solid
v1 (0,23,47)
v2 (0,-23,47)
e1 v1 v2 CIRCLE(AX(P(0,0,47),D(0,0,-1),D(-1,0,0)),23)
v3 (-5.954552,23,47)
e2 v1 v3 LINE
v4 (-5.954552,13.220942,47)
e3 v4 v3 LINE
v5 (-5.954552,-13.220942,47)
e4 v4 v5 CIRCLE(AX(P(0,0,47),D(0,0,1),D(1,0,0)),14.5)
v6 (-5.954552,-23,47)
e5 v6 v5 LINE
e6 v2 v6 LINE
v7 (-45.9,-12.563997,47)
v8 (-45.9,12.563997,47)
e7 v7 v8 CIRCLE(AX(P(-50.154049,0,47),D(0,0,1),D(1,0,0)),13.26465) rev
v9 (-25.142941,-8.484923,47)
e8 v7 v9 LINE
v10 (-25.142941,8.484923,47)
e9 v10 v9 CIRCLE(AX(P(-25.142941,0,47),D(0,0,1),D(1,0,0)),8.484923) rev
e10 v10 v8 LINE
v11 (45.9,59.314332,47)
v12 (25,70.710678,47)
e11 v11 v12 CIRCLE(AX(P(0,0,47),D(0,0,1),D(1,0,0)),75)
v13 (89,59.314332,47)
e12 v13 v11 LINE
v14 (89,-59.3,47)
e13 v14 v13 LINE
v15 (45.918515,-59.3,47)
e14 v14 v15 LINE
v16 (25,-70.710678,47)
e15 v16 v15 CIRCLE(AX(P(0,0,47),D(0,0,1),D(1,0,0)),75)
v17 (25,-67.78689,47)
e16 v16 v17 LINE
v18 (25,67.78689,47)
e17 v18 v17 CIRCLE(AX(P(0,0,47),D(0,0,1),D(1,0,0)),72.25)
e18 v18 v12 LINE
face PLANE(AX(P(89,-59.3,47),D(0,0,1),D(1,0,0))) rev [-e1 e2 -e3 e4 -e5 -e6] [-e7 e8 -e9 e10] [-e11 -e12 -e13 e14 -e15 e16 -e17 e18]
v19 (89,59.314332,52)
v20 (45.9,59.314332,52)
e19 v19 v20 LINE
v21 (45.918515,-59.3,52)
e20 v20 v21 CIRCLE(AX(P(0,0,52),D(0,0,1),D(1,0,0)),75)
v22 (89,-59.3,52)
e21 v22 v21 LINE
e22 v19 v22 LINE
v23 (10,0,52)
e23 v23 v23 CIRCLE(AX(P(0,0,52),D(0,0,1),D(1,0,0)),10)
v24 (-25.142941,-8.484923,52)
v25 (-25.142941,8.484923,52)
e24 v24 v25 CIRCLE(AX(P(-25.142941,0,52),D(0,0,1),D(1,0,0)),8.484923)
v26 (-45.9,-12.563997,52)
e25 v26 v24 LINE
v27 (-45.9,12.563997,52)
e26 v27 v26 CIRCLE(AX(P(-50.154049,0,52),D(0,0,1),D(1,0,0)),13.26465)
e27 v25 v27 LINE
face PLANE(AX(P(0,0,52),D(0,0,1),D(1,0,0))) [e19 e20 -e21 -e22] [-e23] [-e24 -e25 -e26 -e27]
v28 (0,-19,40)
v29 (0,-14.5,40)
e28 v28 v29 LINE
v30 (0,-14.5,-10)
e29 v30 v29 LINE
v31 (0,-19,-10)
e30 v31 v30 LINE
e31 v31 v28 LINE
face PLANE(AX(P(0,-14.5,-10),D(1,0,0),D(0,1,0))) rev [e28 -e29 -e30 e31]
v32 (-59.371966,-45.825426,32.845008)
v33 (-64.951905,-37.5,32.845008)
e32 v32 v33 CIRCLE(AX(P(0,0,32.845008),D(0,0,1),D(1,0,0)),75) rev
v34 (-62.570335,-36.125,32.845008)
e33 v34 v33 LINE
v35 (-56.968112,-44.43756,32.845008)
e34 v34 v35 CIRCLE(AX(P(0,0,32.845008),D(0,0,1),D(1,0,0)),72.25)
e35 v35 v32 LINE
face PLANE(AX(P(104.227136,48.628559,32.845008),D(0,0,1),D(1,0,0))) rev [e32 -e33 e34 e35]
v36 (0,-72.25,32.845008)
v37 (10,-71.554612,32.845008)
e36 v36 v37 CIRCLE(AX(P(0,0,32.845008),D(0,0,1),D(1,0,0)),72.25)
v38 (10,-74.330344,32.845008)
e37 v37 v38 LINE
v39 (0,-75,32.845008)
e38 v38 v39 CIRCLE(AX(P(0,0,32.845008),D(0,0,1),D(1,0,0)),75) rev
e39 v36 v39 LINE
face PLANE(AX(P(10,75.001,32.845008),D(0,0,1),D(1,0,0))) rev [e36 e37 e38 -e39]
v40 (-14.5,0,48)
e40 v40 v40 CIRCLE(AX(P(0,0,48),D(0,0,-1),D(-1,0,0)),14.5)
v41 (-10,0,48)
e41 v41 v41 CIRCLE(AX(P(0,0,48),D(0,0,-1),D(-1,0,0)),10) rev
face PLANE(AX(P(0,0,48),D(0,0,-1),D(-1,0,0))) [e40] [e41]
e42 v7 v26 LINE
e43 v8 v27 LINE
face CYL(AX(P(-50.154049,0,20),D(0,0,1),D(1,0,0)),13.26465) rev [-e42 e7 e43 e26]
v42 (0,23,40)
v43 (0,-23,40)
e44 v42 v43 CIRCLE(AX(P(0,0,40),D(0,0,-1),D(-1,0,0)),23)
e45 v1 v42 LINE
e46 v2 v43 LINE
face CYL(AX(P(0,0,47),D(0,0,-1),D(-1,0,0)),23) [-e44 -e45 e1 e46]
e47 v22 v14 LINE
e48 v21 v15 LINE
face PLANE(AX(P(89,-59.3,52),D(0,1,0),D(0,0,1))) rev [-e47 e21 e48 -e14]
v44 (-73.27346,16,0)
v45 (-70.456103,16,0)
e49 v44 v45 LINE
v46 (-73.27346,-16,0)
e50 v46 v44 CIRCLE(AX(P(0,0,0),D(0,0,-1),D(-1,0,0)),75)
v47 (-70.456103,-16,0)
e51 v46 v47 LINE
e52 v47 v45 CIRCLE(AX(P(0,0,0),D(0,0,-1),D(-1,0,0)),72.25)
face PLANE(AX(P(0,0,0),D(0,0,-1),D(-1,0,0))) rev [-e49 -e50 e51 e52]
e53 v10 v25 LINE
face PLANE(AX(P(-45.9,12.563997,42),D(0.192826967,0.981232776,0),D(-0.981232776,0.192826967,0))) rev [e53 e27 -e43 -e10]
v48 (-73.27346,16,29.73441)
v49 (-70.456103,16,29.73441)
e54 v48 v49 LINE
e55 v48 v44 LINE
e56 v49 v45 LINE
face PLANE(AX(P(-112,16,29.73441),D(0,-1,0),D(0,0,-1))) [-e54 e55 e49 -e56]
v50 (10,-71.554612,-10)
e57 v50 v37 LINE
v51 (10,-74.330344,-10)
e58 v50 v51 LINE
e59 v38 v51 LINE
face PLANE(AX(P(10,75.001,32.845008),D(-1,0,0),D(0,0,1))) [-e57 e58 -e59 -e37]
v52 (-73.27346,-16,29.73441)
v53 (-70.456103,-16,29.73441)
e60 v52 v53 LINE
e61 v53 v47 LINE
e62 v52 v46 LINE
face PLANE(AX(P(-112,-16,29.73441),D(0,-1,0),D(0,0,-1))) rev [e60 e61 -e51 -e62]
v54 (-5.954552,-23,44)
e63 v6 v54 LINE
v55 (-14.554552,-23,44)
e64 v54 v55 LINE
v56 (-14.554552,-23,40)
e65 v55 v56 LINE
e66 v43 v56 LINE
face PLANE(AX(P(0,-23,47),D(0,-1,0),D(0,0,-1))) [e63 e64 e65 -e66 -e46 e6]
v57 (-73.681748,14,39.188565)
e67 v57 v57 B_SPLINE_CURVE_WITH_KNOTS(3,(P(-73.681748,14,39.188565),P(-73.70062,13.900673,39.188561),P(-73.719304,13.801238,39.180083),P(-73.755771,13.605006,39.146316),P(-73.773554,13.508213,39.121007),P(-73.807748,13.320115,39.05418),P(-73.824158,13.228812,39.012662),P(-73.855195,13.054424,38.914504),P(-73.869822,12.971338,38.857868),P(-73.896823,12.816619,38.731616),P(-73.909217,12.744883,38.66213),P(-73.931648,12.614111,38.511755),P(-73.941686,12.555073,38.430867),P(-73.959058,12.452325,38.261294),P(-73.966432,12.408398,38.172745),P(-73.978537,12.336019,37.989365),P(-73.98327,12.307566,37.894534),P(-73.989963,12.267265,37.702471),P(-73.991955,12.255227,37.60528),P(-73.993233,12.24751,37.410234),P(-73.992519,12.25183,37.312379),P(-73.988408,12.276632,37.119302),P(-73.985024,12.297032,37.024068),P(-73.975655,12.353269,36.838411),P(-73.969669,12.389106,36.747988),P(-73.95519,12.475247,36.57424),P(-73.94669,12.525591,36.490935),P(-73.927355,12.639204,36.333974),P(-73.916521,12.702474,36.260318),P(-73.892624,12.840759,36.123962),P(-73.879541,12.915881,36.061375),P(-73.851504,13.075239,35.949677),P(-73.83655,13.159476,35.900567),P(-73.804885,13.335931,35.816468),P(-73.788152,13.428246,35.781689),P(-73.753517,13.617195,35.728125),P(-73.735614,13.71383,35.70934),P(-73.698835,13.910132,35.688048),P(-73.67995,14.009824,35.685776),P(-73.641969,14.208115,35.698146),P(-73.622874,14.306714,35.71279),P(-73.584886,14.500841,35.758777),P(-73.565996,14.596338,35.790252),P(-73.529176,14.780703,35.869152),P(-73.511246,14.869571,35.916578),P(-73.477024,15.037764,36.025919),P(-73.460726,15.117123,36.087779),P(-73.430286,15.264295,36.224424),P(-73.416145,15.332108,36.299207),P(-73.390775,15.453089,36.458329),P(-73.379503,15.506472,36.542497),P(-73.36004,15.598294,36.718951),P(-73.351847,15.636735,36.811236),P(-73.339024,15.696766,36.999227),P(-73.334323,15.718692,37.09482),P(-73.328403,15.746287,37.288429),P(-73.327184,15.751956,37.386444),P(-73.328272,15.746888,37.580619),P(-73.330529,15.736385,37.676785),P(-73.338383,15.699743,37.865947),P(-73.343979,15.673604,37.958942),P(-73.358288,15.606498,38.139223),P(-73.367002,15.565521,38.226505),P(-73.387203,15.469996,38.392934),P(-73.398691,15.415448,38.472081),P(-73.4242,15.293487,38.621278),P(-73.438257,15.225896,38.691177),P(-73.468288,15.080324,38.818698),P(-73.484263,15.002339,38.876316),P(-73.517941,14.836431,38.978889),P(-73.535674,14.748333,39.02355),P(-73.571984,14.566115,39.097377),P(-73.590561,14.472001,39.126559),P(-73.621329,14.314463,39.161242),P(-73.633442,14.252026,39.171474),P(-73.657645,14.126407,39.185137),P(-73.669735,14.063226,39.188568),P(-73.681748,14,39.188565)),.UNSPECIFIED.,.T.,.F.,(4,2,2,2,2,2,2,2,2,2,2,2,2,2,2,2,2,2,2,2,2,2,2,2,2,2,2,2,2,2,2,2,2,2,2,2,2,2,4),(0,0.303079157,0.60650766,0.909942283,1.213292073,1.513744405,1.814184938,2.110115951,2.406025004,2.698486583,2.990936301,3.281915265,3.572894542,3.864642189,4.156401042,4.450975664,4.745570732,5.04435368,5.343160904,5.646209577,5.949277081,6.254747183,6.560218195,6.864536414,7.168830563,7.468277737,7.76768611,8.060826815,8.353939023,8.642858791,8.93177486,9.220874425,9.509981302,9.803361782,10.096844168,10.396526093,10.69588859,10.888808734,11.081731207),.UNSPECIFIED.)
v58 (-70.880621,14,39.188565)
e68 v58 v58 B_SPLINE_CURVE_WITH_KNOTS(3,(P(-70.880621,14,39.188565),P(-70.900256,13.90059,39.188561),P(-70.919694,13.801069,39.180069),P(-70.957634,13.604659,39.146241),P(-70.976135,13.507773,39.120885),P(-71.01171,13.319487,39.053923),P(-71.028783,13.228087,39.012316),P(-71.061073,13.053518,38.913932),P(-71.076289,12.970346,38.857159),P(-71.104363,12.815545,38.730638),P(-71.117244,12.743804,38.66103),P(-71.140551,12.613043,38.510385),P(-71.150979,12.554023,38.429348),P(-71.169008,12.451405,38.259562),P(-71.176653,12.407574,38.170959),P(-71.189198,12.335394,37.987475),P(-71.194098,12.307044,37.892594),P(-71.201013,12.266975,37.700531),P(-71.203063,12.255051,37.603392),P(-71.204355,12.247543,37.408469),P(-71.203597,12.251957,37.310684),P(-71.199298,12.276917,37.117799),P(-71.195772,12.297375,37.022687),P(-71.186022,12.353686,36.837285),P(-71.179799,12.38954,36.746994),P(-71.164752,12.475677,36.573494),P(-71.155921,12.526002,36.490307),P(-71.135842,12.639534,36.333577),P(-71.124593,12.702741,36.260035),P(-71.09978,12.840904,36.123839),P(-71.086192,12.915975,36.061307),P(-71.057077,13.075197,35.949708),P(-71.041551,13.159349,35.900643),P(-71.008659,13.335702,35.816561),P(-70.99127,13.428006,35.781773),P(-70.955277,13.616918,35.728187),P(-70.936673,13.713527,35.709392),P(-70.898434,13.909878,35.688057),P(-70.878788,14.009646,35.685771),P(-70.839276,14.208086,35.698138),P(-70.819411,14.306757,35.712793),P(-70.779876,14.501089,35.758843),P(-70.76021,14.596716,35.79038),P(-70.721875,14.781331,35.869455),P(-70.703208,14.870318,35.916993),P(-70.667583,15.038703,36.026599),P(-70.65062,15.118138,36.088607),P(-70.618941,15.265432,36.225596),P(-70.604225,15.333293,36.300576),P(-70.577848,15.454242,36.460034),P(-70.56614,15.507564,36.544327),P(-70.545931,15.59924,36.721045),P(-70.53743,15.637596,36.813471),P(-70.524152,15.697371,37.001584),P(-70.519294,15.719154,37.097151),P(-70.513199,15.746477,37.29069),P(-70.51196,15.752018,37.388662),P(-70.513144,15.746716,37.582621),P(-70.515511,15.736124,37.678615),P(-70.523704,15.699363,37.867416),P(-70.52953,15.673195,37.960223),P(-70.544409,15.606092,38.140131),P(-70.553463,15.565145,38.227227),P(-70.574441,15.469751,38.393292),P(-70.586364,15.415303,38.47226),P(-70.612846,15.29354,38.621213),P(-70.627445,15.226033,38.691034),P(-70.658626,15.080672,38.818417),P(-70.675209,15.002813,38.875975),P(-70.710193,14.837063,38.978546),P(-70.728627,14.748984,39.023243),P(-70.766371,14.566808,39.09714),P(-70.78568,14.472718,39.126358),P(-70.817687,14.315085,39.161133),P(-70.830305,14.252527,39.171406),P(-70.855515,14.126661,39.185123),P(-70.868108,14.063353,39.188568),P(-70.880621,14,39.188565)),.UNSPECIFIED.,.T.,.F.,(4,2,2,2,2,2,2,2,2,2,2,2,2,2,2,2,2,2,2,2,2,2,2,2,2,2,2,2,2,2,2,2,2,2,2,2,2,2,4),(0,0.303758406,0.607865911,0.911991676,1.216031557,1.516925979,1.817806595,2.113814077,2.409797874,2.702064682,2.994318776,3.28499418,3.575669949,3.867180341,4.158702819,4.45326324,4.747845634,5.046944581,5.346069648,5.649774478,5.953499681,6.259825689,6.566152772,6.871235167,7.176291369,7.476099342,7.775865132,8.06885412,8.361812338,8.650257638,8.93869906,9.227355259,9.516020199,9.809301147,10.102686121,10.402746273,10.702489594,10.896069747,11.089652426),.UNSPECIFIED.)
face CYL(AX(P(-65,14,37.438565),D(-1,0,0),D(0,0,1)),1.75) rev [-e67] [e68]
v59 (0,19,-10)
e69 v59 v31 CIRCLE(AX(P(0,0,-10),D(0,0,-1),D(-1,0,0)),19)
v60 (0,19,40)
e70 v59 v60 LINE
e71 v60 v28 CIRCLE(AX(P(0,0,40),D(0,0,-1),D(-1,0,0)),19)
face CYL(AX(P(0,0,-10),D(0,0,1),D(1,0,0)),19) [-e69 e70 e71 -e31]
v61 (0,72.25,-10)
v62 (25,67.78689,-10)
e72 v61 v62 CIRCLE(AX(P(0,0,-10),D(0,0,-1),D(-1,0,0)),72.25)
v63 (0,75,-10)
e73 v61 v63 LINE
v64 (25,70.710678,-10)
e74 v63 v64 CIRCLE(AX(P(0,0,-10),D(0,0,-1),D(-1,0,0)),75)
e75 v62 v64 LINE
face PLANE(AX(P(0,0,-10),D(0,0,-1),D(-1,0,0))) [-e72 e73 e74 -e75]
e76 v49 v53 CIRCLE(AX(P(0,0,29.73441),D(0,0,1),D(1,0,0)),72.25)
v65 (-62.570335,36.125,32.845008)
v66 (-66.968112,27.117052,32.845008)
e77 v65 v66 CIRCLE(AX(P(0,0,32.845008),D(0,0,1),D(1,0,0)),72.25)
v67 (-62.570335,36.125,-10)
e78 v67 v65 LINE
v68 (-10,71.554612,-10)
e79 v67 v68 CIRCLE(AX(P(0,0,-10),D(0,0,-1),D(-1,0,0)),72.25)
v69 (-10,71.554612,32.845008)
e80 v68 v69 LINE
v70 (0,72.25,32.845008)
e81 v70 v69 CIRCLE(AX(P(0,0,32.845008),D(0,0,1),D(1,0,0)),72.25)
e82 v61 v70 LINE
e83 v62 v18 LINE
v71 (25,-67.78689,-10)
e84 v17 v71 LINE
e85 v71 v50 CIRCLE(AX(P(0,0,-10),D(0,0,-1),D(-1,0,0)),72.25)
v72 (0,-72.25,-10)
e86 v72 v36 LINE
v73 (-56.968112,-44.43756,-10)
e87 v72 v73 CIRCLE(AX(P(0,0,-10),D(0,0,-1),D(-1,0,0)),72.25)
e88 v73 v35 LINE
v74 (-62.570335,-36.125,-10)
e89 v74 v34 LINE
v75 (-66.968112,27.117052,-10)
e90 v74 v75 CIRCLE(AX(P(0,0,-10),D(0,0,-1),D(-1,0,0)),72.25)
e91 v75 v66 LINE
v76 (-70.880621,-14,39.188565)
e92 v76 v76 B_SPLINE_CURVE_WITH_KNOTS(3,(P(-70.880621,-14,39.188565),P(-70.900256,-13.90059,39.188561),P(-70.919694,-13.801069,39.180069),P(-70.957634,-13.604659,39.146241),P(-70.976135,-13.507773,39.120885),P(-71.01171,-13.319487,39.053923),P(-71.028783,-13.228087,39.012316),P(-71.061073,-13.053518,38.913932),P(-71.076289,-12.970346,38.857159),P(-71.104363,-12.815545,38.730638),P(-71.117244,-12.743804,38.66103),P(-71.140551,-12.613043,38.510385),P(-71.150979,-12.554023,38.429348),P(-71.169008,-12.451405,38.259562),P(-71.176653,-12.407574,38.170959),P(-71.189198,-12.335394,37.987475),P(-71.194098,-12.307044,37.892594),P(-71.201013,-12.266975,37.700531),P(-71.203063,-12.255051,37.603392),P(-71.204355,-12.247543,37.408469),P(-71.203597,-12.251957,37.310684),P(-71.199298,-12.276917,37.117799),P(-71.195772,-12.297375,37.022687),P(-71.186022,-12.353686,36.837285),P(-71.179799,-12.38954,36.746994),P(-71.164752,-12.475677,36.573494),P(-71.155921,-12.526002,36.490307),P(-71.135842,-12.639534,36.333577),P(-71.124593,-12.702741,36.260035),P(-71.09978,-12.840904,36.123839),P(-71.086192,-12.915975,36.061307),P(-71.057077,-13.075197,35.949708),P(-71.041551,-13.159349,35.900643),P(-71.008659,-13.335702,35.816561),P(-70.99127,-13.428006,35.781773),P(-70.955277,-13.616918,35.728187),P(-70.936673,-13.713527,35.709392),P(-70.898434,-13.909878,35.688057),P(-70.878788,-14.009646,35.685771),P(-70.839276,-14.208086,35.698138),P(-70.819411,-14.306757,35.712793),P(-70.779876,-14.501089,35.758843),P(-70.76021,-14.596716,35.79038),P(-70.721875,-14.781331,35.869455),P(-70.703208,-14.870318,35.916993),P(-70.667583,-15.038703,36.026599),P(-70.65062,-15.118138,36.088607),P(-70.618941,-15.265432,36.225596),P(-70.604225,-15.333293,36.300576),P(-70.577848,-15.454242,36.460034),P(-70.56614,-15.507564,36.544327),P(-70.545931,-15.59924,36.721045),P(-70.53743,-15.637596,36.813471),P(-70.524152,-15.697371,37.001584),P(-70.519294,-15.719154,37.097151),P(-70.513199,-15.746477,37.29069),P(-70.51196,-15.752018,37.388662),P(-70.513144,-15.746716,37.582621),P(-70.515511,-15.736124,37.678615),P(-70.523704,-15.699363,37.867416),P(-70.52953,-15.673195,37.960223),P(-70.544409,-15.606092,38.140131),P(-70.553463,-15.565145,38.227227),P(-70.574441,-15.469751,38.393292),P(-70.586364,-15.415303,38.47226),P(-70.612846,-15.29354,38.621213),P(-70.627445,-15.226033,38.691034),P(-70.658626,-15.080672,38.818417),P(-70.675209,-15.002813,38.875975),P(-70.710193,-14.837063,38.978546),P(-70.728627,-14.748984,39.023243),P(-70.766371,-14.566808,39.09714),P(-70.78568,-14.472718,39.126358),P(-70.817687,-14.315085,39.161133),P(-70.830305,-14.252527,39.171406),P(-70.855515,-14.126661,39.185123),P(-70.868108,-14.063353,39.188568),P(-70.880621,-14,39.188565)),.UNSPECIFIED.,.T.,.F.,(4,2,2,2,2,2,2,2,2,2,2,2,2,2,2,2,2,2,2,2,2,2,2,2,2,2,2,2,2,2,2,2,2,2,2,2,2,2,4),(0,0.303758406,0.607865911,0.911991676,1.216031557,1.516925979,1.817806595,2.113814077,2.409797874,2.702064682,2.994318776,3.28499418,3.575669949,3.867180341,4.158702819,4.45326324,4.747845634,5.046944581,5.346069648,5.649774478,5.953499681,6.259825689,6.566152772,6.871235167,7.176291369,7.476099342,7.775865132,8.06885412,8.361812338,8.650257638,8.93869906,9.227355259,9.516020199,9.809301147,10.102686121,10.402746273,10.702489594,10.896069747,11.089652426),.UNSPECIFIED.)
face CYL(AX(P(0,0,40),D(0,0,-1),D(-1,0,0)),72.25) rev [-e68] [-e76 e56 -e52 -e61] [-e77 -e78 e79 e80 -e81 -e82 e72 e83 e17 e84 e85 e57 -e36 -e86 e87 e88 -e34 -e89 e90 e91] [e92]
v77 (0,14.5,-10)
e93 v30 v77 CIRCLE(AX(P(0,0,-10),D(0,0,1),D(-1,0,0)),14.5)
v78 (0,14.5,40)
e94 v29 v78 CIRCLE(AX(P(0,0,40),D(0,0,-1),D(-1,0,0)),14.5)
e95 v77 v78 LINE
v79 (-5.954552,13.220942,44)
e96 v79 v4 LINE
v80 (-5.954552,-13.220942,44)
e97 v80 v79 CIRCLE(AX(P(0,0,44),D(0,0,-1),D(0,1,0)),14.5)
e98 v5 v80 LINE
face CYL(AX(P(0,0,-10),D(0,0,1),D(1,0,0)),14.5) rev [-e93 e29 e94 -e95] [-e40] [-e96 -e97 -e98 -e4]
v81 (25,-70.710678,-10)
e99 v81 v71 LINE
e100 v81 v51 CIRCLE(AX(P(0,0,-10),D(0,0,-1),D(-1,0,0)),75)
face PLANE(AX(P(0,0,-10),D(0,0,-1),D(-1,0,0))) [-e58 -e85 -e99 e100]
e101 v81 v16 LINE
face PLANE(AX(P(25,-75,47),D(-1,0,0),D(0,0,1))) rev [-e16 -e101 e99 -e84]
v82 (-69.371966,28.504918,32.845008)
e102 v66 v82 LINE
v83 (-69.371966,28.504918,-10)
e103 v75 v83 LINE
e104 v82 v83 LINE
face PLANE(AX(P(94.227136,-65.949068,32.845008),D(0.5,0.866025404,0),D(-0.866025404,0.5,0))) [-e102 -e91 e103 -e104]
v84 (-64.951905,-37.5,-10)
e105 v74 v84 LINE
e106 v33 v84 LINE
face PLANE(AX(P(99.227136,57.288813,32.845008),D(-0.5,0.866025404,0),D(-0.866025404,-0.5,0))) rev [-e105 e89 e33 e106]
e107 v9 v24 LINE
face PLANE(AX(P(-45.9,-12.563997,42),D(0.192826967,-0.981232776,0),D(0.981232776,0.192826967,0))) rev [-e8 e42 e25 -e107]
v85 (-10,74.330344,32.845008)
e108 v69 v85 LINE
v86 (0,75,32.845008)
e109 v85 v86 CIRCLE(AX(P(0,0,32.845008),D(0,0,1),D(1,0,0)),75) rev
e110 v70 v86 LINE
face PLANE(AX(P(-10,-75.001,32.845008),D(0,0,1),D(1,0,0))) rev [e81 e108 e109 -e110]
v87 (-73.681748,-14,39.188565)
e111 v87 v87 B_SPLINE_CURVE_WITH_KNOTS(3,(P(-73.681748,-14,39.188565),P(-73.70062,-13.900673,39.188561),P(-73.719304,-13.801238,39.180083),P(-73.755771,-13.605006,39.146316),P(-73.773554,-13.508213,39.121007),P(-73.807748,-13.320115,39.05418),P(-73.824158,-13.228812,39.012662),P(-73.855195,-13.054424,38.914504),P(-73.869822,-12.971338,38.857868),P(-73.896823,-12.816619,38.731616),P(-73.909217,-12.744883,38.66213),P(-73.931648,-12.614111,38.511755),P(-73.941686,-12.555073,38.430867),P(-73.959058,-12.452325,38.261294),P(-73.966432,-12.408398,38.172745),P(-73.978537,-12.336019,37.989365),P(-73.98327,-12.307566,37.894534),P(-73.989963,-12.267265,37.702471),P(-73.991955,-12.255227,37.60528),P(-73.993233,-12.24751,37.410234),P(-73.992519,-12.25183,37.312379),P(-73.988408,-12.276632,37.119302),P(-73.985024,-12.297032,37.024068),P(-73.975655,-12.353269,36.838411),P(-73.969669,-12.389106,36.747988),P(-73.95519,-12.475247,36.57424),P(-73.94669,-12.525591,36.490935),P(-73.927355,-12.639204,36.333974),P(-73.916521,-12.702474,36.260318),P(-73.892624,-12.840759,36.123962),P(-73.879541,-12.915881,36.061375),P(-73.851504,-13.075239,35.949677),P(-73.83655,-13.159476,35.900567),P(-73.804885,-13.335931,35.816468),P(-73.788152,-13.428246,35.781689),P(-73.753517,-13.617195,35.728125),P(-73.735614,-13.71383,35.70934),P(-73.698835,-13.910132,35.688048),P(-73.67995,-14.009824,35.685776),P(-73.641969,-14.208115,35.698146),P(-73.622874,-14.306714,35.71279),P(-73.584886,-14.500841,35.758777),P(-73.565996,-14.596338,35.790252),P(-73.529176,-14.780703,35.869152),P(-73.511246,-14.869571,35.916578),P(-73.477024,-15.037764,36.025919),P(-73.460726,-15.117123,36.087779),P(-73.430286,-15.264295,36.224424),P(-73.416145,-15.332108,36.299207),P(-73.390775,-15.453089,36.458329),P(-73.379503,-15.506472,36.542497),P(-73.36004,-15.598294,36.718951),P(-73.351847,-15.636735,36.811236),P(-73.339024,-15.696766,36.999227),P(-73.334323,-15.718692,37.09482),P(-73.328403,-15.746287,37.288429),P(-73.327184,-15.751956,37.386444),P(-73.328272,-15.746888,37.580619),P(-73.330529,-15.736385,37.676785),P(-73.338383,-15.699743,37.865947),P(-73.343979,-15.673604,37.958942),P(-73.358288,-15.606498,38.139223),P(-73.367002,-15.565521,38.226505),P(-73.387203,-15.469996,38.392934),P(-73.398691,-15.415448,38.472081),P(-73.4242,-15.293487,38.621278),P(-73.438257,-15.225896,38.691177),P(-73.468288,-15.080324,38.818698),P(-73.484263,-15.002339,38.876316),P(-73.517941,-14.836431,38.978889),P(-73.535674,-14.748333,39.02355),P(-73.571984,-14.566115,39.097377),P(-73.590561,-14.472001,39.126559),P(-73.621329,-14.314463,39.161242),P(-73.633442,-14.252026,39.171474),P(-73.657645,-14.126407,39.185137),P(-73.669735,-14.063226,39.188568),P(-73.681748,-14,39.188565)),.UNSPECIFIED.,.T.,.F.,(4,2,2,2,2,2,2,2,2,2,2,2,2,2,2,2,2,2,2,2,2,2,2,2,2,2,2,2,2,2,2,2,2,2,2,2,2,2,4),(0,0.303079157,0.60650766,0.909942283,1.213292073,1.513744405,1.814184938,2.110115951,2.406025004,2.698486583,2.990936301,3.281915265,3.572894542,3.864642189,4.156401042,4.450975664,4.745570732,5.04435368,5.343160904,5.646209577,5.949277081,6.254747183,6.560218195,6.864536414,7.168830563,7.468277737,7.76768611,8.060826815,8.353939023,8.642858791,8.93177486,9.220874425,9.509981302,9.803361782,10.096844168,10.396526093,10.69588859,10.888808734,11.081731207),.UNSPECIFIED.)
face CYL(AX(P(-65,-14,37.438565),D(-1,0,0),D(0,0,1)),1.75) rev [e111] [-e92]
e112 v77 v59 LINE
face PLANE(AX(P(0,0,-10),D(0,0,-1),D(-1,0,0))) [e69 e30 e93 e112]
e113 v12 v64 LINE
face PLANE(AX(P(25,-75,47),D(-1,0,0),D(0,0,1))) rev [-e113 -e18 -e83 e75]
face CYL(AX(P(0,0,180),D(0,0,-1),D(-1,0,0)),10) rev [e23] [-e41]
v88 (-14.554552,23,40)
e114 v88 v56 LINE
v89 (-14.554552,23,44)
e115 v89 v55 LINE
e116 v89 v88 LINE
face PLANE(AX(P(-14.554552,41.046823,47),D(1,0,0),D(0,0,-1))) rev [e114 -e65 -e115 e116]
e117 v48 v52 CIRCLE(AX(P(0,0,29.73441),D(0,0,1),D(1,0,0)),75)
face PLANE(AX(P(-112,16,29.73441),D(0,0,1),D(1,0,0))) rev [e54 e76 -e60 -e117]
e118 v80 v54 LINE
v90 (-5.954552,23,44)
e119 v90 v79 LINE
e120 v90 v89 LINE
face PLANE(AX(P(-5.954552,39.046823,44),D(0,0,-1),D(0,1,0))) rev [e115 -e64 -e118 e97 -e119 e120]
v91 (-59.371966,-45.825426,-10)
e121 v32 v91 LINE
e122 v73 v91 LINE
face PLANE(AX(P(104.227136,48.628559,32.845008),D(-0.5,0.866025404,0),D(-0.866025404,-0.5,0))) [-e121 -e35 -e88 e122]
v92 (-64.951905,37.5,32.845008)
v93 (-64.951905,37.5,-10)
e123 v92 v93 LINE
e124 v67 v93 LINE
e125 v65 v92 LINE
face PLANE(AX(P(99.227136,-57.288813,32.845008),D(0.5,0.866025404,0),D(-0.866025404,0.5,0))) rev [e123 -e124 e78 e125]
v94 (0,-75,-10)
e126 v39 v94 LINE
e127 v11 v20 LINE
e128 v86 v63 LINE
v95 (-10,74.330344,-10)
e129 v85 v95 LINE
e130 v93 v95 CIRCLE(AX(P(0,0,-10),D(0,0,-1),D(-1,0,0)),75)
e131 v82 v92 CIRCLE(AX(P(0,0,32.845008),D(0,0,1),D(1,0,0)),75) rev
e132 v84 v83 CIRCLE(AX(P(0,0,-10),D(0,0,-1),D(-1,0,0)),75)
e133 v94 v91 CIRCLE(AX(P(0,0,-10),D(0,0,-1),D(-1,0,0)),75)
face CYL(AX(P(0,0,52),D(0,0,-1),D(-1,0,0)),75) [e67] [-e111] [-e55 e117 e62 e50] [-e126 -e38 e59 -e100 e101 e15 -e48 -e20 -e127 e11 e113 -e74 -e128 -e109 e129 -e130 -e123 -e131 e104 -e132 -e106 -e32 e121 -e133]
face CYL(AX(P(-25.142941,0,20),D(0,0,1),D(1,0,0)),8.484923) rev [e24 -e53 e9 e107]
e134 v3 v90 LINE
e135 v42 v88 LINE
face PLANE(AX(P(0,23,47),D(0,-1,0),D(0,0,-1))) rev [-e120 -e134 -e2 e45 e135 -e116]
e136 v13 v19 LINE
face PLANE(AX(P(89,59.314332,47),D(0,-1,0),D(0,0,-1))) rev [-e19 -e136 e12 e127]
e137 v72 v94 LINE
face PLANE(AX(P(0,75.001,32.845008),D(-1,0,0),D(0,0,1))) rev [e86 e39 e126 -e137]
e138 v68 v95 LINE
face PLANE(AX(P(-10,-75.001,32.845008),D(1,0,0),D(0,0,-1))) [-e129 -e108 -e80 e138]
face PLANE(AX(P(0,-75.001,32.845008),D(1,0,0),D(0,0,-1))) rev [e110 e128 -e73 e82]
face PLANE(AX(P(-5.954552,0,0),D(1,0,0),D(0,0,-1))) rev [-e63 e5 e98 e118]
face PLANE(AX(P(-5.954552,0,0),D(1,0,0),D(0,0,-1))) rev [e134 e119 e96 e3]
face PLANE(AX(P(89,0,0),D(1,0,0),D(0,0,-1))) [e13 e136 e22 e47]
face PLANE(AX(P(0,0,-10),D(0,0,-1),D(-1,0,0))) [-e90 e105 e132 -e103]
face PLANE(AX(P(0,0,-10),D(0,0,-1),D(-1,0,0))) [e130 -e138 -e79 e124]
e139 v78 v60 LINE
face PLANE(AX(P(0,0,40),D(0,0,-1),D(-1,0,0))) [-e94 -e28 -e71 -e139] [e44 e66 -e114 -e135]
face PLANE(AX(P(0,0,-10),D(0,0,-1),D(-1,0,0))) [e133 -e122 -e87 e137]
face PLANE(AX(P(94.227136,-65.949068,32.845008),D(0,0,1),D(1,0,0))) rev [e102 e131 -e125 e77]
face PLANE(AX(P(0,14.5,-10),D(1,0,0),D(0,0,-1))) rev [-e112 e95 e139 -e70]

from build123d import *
from build123d.topology import SkipClean

# Parameters (mm, degrees)
SKETCH1_R                = 75
BOSS_EXTRUDE1_DEPTH      = 52
BOSS_EXTRUDE2_DEPTH      = 89
SKETCH6_R                = 67.5
CUT_EXTRUDE1_DEPTH       = 40
SKETCH7_R                = 10
CUT_EXTRUDE2_DEPTH       = 140
BOSS_EXTRUDE3_DEPTH      = 50
SKETCH27_R               = 13.264650289
SKETCH27_R_2             = 8.484923144
CUT_EXTRUDE7_DEPTH       = 32
SKETCH28_W               = 110.347797284
SKETCH28_H               = 32
CUT_EXTRUDE9_DEPTH       = 112
SKETCH30_R               = 1.75
CUT_EXTRUDE10_DEPTH      = 10
SKETCH31_W               = 17.16689537
SKETCH31_H               = 79.570672492
CUT_EXTRUDE11_DEPTH      = 7
SKETCH32_W               = 3
SKETCH32_H               = 75.570672492
CUT_EXTRUDE12_DEPTH      = 8.6
CUT_EXTRUDE13_START      = -8
SKETCH34_R               = 14.5
CUT_EXTRUDE13_DEPTH      = 8
BOSS_EXTRUDE4_START      = 10
SKETCH35_R               = 75
SKETCH35_R_2             = 67.5
BOSS_EXTRUDE4_DEPTH      = 10
SKETCH37_R               = 72.25
SKETCH37_R_2             = 67.5
CUT_EXTRUDE15_DEPTH      = 50
CUT_EXTRUDE16_DEPTH      = 7
CUT_EXTRUDE17_DEPTH      = 7
CUT_EXTRUDE19_REACH      = 184.003
CUT_EXTRUDE19_END_RADIUS = 72.25
SKETCH42_W               = 10
SKETCH42_H               = 42.845008339
CIRPATTERN1_COUNT        = 5
CIRPATTERN1_ANGLE        = 180
CIRPATTERN2_COUNT        = 3
CIRPATTERN2_ANGLE        = 120
CUT_EXTRUDE20_DEPTH      = 10
SKETCH44_W               = 50
SKETCH44_H               = 57
CUT_EXTRUDE21_DEPTH      = 183.002747343


with BuildPart() as part:
    # Sketch1 → Boss-Extrude1 (new body)
    with BuildSketch(Plane.XY):
        Circle(SKETCH1_R)
    extrude(amount=BOSS_EXTRUDE1_DEPTH)

    # Sketch5 → Boss-Extrude2 (add)
    with BuildSketch(Plane(origin=(0, 0, 0), x_dir=(0, 0, -1), z_dir=(1, 0, 0))):
        Polygon((-52, 59.314332163), (-52, 0), (-52, -59.3), (-47, -59.3), (-47, 59.314332163), align=None)
    extrude(amount=BOSS_EXTRUDE2_DEPTH)

    # Sketch6 → Cut-Extrude1 (cut)
    with BuildSketch(Plane(origin=(0, 0, 0), x_dir=(-1, 0, 0), z_dir=(0, 0, -1))):
        Circle(SKETCH6_R)
    extrude(amount=-CUT_EXTRUDE1_DEPTH, mode=Mode.SUBTRACT)

    # Sketch7 → Cut-Extrude2 (cut)
    with BuildSketch(Plane(origin=(0, 0, 40), x_dir=(-1, 0, 0), z_dir=(0, 0, -1))):
        Circle(SKETCH7_R)
    extrude(amount=-CUT_EXTRUDE2_DEPTH, mode=Mode.SUBTRACT)

    # Sketch8 → Boss-Extrude3 (add)
    with BuildSketch(Plane(origin=(0, 0, 40), x_dir=(-1, 0, 0), z_dir=(0, 0, -1))):
        with BuildLine():
            Line((0, 14.5), (0, 19))
            ThreePointArc((0, 19), (-19, 0), (0, -19))
            Line((0, -19), (0, -14.5))
            ThreePointArc((0, -14.5), (-14.5, 0), (0, 14.5))
        make_face()
    extrude(amount=BOSS_EXTRUDE3_DEPTH)

    # Sketch27 → Cut-Extrude7 (cut)
    with BuildSketch(Plane.XY.offset(52)):
        with Locations((-50.154049213, 0)):
            Circle(SKETCH27_R)
        with Locations((-25.142941415, 0)):
            Circle(SKETCH27_R_2)
    extrude(amount=-CUT_EXTRUDE7_DEPTH, mode=Mode.SUBTRACT)

    # Sketch28 → Cut-Extrude9 (cut)
    with BuildSketch(Plane(origin=(0, 0, 0), x_dir=(0, 0, -1), z_dir=(1, 0, 0))):
        with Locations((25.439488733, 0)):
            Rectangle(SKETCH28_W, SKETCH28_H)
    extrude(amount=-CUT_EXTRUDE9_DEPTH, mode=Mode.SUBTRACT)

    # Sketch30 → Cut-Extrude10 (cut)
    with BuildSketch(Plane(origin=(-75, 0, 0), x_dir=(0, 0, -1), z_dir=(1, 0, 0))):
        with Locations(Location((-37.43856487, -14, 0), (0, 0, 180))):
            Circle(SKETCH30_R)
    cut_extrude10 = extrude(amount=CUT_EXTRUDE10_DEPTH, mode=Mode.SUBTRACT)

    # Mirror1: Cut-Extrude10 across plane
    add(cut_extrude10.mirror(Plane.ZX), mode=Mode.SUBTRACT)

    # Sketch31 → Cut-Extrude11 (cut)
    with BuildSketch(Plane(origin=(0, 0, 40), x_dir=(-1, 0, 0), z_dir=(0, 0, -1))):
        with Locations((23.137999933, 1.261486271)):
            Rectangle(SKETCH31_W, SKETCH31_H)
    extrude(amount=-CUT_EXTRUDE11_DEPTH, mode=Mode.SUBTRACT)

    # Sketch32 → Cut-Extrude12 (cut)
    with BuildSketch(Plane.ZY.offset(14.554552248)):
        with Locations((45.5, 1.261486271)):
            Rectangle(SKETCH32_W, SKETCH32_H)
    extrude(amount=-CUT_EXTRUDE12_DEPTH, mode=Mode.SUBTRACT)

    # Sketch34 → Cut-Extrude13 (cut)
    with SkipClean():  # the faces are left unmerged after this step: merging them gives an invalid solid
        with BuildSketch(Plane(origin=(0, 0, 40), x_dir=(-1, 0, 0), z_dir=(0, 0, -1)).offset(CUT_EXTRUDE13_START)):
            with Locations(Location((0, 0, 0), (0, 0, 90))):
                Circle(SKETCH34_R)
        extrude(amount=CUT_EXTRUDE13_DEPTH, mode=Mode.SUBTRACT)

    # Sketch35 → Boss-Extrude4 (add)
    with BuildSketch(Plane(origin=(0, 0, 0), x_dir=(-1, 0, 0), z_dir=(0, 0, -1)).offset(BOSS_EXTRUDE4_START)):
        Circle(SKETCH35_R)
        Circle(SKETCH35_R_2, mode=Mode.SUBTRACT)
    extrude(amount=-BOSS_EXTRUDE4_DEPTH)

    # Sketch37 → Cut-Extrude15 (cut)
    with BuildSketch(Plane(origin=(0, 0, -10), x_dir=(-1, 0, 0), z_dir=(0, 0, -1))):
        Circle(SKETCH37_R)
        Circle(SKETCH37_R_2, mode=Mode.SUBTRACT)
    extrude(amount=-CUT_EXTRUDE15_DEPTH, mode=Mode.SUBTRACT)

    # Sketch38 → Cut-Extrude16 (cut)
    with BuildSketch(Plane(origin=(0, 0, 40), x_dir=(-1, 0, 0), z_dir=(0, 0, -1))):
        with BuildLine():
            Line((0, -23), (68.491331568, -23))
            ThreePointArc((68.491331568, -23), (-72.25, 0), (68.491331568, 23))
            Line((68.491331568, 23), (0, 23))
            ThreePointArc((0, 23), (-23, 0), (0, -23))
        make_face()
    extrude(amount=-CUT_EXTRUDE16_DEPTH, mode=Mode.SUBTRACT)

    # Sketch39 → Cut-Extrude17 (cut)
    with BuildSketch(Plane(origin=(0, 0, 40), x_dir=(-1, 0, 0), z_dir=(0, 0, -1))):
        with BuildLine():
            Line((68.491331568, 23), (31.721447618, 23))
            Line((31.721447618, 23), (31.721447618, -23))
            Line((31.721447618, -23), (68.491331568, -23))
            ThreePointArc((68.491331568, -23), (72.25, 0), (68.491331568, 23))
        make_face()
    extrude(amount=-CUT_EXTRUDE17_DEPTH, mode=Mode.SUBTRACT)

    # Cut-Extrude19: up to this cylinder (the profile starts outside it)
    cut_extrude19_end = Plane(origin=(0, 0, 11.422504), z_dir=(0, 0, -1)) * Cylinder(CUT_EXTRUDE19_END_RADIUS, 513.506, mode=Mode.PRIVATE)
    # Sketch42 → Cut-Extrude19 (cut, up to the surface)
    with BuildSketch(Plane(origin=(0, 75, 0), x_dir=(1, 0, 0), z_dir=(0, 1, 0)), mode=Mode.PRIVATE) as cut_extrude19_sk1:
        with Locations((-5, -11.42250417)):
            Rectangle(SKETCH42_W, SKETCH42_H)
    cut_extrude19_tool1 = extrude(cut_extrude19_sk1.sketch, amount=-CUT_EXTRUDE19_REACH, mode=Mode.PRIVATE) - cut_extrude19_end
    cut_extrude19 = cut_extrude19_tool1.solids().sort_by_distance((-5, 75, 11.422504))[0]
    add(cut_extrude19, mode=Mode.SUBTRACT)

    # CirPattern1: Cut-Extrude19 ×5 about axis
    cirpattern1_axis = Axis((0, 0, 0), (0, 0, -1))
    for i in range(1, CIRPATTERN1_COUNT):
        add(cut_extrude19.rotate(cirpattern1_axis, i * CIRPATTERN1_ANGLE / (CIRPATTERN1_COUNT - 1)), mode=Mode.SUBTRACT)

    # CirPattern2: Cut-Extrude19 ×3 about axis
    cirpattern2_axis = Axis((0, 0, 0), (0, 0, 1))
    for i in range(1, CIRPATTERN2_COUNT):
        add(cut_extrude19.rotate(cirpattern2_axis, i * CIRPATTERN2_ANGLE / (CIRPATTERN2_COUNT - 1)), mode=Mode.SUBTRACT)

    # Sketch43 → Cut-Extrude20 (cut)
    with BuildSketch(Plane.XY.offset(52)):
        Polygon((-45.9, -12.56399668), (-25.142941415, -8.484923144), (-25.142941415, 8.484923144), (-45.9, 12.56399668), align=None)
    extrude(amount=-CUT_EXTRUDE20_DEPTH, mode=Mode.SUBTRACT)

    # Sketch44 → Cut-Extrude21 (cut, through all)
    with SkipClean():  # the faces are left unmerged after this step: merging them gives an invalid solid
        with BuildSketch(Plane(origin=(0, 75, 0), x_dir=(1, 0, 0), z_dir=(0, 1, 0))):
            with Locations((50, -18.5)):
                Rectangle(SKETCH44_W, SKETCH44_H)
        extrude(amount=-CUT_EXTRUDE21_DEPTH, mode=Mode.SUBTRACT)
    add(part.part.scale(1), mode=Mode.REPLACE)  # the faces are merged on a copy


solid = part.part
